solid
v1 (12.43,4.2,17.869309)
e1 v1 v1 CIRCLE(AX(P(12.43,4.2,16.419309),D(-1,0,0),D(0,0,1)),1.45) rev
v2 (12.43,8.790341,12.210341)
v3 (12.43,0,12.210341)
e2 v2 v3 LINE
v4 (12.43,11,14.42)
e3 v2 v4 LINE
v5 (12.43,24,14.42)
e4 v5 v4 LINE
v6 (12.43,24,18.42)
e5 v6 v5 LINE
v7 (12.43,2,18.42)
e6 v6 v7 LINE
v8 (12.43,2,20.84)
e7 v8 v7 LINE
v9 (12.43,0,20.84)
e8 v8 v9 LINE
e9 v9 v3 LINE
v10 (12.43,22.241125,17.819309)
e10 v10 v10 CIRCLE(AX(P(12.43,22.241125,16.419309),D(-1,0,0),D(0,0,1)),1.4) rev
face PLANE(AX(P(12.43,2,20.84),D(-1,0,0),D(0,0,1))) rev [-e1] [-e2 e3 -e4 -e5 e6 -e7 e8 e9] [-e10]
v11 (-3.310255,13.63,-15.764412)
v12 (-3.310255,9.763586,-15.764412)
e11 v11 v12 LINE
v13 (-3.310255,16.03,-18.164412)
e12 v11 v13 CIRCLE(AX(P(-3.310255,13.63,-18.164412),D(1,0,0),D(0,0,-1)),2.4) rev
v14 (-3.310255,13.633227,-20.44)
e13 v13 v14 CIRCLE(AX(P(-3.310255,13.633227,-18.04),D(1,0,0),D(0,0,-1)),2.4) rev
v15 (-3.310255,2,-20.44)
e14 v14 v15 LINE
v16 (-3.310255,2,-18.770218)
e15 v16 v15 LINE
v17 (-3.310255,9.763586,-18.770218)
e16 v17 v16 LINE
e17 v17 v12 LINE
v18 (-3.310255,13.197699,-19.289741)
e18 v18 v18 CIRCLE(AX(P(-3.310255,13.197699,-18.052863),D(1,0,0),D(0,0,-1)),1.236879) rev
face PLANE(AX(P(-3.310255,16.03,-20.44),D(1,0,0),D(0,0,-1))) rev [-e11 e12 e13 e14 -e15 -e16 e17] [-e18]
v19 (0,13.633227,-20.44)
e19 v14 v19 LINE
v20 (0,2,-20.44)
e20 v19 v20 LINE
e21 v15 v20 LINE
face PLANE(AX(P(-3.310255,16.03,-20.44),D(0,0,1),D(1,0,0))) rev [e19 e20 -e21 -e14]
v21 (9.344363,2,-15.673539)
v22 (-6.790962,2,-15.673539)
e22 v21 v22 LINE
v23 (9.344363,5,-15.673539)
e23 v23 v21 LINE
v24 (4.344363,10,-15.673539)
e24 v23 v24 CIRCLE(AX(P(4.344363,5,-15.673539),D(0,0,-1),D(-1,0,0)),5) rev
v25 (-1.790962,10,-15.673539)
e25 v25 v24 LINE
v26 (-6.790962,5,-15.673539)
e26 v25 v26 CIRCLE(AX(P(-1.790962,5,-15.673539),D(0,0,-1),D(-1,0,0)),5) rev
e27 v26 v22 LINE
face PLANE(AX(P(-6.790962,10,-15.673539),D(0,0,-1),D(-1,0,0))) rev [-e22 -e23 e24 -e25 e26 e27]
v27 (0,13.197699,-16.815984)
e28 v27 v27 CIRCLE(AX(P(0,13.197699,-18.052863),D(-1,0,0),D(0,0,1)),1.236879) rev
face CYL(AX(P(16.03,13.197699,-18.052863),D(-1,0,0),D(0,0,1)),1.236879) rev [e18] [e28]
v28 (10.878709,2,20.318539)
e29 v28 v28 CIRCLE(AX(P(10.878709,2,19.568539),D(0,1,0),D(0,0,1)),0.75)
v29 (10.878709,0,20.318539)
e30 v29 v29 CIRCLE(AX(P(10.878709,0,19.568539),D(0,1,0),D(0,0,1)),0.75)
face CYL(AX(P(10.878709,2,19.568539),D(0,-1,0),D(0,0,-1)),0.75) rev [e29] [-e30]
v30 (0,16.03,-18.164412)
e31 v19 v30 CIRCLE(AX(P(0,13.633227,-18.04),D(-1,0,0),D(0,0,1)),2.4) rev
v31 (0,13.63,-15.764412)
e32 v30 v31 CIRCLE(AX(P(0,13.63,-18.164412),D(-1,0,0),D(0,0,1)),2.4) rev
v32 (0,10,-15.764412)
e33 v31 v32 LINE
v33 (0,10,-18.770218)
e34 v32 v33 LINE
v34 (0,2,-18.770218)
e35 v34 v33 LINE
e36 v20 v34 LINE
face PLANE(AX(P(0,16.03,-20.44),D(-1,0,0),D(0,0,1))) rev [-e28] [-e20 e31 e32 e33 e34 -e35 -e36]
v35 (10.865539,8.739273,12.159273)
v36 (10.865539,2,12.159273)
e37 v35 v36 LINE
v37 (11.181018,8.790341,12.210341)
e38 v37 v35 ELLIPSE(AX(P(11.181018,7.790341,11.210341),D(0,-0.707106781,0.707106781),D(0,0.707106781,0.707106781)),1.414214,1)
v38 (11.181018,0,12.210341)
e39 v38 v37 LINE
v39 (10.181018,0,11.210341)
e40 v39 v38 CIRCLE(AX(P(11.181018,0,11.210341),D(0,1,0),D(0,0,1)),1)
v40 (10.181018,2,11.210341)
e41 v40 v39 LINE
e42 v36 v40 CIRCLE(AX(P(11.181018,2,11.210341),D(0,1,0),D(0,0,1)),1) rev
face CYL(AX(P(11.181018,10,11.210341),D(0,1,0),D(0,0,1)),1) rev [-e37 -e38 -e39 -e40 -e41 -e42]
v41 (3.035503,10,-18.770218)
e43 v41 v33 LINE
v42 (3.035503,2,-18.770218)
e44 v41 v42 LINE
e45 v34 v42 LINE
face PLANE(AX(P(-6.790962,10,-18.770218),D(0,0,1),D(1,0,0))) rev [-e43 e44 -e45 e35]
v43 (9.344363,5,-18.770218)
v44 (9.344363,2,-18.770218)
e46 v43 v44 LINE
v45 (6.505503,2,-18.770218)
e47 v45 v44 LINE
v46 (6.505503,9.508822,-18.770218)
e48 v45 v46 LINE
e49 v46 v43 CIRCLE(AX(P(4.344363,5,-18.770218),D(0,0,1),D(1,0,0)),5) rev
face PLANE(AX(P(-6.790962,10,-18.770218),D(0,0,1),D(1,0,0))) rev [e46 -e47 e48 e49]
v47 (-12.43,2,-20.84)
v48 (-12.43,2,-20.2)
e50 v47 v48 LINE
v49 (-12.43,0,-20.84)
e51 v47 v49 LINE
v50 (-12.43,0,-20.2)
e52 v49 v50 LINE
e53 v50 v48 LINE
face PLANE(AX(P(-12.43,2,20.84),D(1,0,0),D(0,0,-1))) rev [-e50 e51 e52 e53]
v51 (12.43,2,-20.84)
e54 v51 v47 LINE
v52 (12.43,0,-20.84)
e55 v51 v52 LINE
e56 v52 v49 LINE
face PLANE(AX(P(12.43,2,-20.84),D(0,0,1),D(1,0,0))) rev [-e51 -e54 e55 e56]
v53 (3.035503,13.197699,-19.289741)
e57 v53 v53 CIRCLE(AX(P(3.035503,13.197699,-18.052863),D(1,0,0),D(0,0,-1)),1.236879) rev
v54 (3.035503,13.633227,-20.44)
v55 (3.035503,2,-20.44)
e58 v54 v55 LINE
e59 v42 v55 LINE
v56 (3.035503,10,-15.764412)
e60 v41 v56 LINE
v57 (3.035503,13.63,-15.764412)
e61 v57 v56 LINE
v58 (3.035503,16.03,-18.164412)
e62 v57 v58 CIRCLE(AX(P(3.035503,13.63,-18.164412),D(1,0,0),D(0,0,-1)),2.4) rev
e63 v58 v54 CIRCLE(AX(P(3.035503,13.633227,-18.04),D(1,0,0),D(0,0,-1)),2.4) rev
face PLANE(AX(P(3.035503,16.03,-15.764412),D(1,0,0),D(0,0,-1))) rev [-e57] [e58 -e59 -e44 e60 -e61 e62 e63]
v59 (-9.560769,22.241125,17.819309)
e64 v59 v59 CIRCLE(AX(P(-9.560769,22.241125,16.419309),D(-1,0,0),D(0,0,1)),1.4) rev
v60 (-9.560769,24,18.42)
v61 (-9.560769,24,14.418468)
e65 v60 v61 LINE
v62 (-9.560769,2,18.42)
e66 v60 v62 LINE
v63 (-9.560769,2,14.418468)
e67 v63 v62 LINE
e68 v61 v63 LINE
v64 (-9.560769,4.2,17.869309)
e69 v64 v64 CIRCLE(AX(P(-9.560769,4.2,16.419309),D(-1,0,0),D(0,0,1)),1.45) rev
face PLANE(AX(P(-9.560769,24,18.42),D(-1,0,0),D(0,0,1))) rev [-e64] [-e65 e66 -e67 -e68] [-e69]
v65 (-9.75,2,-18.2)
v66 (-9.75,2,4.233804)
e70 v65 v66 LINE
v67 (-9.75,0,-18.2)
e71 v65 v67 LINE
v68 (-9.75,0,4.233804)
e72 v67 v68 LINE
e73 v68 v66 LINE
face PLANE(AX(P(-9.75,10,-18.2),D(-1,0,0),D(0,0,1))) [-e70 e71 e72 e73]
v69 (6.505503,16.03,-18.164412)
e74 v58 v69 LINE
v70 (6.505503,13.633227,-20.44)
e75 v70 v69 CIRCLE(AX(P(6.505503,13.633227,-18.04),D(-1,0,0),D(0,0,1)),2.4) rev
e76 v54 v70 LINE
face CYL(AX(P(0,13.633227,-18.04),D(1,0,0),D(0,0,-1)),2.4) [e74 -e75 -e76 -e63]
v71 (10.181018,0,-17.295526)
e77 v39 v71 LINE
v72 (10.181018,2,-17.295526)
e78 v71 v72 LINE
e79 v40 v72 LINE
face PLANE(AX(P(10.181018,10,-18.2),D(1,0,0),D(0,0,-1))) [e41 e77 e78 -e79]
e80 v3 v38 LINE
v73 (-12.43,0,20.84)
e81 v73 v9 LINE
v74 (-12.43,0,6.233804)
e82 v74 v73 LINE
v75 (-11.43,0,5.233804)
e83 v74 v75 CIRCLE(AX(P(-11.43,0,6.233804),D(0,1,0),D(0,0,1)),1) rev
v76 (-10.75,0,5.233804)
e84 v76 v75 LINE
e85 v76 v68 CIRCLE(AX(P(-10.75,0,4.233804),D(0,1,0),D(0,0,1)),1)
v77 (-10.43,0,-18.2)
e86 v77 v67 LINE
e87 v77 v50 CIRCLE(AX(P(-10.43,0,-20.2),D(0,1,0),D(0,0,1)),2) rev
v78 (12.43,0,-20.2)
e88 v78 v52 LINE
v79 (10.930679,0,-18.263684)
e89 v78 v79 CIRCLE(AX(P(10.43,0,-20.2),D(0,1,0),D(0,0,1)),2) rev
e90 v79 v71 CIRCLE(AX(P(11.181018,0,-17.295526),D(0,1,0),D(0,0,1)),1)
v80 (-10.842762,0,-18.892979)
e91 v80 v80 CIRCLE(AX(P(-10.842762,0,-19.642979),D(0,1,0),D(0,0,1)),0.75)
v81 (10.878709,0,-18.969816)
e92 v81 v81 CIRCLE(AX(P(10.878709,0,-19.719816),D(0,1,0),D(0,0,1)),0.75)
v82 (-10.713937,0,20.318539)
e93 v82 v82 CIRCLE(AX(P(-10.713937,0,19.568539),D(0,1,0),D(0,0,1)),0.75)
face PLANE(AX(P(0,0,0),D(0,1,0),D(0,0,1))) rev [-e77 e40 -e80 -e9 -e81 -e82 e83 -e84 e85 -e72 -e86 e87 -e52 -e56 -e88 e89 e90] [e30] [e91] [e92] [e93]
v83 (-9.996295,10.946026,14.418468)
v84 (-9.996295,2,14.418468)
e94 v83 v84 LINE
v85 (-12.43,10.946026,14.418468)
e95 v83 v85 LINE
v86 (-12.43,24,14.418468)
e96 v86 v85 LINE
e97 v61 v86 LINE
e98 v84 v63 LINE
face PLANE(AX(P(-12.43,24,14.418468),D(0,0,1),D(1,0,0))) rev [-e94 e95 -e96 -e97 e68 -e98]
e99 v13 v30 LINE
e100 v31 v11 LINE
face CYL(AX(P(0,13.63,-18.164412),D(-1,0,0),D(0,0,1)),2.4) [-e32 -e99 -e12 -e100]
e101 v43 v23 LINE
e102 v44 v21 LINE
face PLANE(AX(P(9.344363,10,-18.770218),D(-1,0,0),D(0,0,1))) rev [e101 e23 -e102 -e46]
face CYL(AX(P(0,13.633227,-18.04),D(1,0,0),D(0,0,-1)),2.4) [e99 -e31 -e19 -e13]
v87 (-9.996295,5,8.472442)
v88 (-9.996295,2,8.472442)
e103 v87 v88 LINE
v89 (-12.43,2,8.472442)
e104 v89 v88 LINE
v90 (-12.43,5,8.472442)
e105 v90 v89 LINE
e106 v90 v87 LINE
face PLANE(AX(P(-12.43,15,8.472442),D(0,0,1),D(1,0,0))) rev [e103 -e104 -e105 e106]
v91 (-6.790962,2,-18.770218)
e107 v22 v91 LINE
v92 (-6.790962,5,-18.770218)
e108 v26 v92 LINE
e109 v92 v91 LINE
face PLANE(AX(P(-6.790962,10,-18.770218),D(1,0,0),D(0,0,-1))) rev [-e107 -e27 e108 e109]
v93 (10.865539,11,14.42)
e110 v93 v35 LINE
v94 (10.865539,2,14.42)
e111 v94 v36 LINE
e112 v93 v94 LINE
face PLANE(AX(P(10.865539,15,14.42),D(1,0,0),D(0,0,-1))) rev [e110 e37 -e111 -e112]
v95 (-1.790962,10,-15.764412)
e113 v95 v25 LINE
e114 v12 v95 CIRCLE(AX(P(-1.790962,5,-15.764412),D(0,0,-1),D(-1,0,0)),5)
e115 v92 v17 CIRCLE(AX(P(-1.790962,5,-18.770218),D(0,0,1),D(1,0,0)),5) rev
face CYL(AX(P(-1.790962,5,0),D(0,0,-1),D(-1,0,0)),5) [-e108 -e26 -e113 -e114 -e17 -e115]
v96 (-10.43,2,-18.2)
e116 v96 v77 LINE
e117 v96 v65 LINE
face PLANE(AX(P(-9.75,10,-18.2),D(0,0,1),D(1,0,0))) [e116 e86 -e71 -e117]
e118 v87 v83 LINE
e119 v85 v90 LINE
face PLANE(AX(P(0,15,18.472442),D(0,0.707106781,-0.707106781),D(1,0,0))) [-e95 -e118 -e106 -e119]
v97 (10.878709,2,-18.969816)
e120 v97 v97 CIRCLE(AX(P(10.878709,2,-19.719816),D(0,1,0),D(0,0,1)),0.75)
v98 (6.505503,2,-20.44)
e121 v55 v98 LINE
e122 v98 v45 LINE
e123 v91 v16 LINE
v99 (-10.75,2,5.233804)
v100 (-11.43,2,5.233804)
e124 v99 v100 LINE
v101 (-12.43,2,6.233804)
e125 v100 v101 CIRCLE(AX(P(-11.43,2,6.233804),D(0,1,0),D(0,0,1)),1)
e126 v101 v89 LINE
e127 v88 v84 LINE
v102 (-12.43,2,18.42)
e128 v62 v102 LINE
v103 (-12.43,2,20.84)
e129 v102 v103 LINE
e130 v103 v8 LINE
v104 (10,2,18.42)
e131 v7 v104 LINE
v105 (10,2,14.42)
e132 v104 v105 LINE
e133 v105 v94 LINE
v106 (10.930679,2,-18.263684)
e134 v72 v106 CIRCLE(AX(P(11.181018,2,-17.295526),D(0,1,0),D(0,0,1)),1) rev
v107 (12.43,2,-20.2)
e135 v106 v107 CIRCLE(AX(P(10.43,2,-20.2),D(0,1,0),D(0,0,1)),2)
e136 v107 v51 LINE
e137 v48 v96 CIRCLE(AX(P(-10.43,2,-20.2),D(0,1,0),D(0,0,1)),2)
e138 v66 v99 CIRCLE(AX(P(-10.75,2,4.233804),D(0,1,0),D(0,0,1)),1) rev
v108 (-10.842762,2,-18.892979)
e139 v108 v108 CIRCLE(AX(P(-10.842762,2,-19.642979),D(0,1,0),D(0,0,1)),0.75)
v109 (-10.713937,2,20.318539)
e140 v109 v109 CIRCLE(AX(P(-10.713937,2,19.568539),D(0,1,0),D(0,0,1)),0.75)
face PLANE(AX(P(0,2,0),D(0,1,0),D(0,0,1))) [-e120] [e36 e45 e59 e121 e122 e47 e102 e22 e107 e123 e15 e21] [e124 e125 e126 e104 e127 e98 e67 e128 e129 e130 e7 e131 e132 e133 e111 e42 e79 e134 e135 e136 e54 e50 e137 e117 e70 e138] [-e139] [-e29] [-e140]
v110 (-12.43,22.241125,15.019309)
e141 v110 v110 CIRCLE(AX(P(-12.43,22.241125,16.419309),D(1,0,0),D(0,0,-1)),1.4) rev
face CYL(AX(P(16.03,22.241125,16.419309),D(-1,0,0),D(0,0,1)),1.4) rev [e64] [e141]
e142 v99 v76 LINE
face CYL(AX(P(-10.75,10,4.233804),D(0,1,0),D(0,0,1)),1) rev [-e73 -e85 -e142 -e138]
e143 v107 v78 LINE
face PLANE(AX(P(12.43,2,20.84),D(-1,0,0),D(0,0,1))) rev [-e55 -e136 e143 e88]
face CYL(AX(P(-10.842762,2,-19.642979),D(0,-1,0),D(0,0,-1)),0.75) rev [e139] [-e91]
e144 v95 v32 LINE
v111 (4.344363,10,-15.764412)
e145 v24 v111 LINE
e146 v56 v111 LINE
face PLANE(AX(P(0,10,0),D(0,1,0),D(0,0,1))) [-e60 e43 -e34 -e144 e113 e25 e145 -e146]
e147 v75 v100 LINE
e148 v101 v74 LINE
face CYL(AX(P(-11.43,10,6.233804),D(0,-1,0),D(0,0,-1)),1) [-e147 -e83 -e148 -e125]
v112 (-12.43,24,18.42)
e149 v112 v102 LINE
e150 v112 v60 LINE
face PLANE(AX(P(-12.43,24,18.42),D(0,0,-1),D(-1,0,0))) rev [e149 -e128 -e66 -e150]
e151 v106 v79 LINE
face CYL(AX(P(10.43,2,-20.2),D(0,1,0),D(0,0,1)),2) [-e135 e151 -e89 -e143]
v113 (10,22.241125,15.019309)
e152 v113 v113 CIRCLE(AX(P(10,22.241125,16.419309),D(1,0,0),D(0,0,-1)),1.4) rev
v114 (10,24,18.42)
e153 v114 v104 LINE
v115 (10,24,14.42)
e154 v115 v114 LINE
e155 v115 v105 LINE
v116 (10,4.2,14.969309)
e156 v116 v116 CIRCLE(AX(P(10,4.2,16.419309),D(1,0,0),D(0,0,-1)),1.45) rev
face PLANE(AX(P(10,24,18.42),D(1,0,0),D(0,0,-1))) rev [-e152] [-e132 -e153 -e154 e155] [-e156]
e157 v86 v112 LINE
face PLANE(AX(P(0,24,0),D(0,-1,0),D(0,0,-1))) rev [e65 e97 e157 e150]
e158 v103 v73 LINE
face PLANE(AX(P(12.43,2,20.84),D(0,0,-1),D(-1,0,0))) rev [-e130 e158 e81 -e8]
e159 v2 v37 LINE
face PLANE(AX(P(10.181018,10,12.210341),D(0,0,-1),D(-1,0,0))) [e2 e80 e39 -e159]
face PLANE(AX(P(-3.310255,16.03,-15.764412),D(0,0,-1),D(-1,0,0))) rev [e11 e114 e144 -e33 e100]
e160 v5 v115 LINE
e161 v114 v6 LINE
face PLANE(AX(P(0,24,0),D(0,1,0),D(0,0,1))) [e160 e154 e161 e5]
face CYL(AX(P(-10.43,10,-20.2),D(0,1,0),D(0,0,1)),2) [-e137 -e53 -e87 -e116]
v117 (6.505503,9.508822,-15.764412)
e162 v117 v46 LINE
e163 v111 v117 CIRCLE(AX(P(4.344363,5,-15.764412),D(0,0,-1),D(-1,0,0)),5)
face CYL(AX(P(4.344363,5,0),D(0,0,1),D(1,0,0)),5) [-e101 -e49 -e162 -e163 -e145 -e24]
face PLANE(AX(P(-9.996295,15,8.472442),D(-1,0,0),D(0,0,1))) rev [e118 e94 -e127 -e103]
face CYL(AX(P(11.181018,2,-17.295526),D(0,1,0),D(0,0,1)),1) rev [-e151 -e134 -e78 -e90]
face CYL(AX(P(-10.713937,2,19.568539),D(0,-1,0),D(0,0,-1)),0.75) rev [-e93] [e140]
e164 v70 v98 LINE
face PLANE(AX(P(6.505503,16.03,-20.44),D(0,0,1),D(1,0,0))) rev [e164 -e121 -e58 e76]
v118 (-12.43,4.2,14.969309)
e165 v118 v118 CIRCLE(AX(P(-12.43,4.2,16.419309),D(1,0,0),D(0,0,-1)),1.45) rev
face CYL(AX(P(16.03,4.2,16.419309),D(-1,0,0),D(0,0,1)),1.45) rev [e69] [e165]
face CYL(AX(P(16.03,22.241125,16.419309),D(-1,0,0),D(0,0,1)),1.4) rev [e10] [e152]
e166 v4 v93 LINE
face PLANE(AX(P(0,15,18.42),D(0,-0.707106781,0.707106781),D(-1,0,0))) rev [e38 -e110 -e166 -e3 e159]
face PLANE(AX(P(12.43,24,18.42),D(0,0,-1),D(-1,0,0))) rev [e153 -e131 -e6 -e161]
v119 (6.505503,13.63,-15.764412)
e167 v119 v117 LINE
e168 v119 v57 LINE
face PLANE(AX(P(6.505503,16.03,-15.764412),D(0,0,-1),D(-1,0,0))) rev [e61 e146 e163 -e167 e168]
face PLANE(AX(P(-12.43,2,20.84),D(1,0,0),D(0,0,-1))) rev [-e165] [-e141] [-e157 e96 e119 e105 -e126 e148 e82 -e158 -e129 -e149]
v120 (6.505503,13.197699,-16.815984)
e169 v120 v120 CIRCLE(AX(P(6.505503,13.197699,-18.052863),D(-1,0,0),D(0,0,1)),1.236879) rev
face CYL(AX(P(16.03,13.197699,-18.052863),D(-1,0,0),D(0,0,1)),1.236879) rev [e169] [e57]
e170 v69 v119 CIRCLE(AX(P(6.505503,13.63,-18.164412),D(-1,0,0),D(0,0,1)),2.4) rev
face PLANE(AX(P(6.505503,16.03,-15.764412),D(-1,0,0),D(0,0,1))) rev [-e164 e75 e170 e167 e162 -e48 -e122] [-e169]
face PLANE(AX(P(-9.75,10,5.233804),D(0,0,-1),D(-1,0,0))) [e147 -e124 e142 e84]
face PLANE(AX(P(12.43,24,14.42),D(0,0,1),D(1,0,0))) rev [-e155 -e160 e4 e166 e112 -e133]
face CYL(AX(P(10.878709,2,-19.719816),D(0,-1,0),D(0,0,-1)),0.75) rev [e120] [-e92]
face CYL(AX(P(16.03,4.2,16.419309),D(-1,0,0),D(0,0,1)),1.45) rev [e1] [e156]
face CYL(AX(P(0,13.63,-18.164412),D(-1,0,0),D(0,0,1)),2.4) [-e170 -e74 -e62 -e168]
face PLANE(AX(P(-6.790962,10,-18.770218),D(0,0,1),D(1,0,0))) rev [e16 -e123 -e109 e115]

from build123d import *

# Parameters (mm, degrees)
SKETCH_1_W                = 24.86
SKETCH_1_H                = 41.68
SKETCH_1_R                = 0.75
EXTRUDE_2_DEPTH           = 2
SKETCH_4_W                = 2.869231424
SKETCH_4_H                = 4.001531821
SKETCH_4_W_2              = 2.43
SKETCH_4_H_2              = 4
EXTRUDE_3_DEPTH           = 24
SKETCH_8_W                = 3.310255182
SKETCH_8_H                = 4.675588029
SKETCH_8_W_2              = 3.47
EXTRUDE_5_DEPTH           = 16.03
FILLET_5_R                = 2.4
FILLET_6_R                = 2.4
FILLET_7_R                = 2.4
FILLET_8_R                = 2.4
CUT_EXTRUDE_7_DEPTH       = 16.03
CUT_EXTRUDE_7_DEPTH_BACK  = 16.03
SKETCH_13_R               = 1.236878532
CUT_EXTRUDE_8_DEPTH       = 16.03
CUT_EXTRUDE_8_DEPTH_BACK  = 16.03
SKETCH_5_R                = 1.45
CUT_EXTRUDE_9_DEPTH       = 16.03
CUT_EXTRUDE_9_DEPTH_BACK  = 16.03
SKETCH_14_R               = 1.4
SKETCH_16_W               = 16.135324728
SKETCH_16_H               = 3.096678483
EXTRUDE_8_DEPTH           = 10
FILLET_10_R               = 5
FILLET_13_R               = 5
SKETCH_17_W               = 2.433704545
SKETCH_17_H               = 5.946026496
SKETCH_17_W_2             = 1.564461462
SKETCH_17_H_2             = 6
EXTRUDE_9_DEPTH           = 15
CHAMFER_1_SIZE            = 10
CHAMFER_2_SIZE            = 10
CUT_EXTRUDE_16_DEPTH      = 10
CUT_EXTRUDE_16_DEPTH_BACK = 10
SKETCH_19_W               = 2.68
SKETCH_19_H               = 23.433804394
CUT_EXTRUDE_17_DEPTH      = 10
CUT_EXTRUDE_17_DEPTH_BACK = 10
SKETCH_18_W               = 2.24898196
SKETCH_18_H               = 30.410340658
FILLET_17_R               = 2
FILLET_18_R               = 2
FILLET_19_R               = 1


with BuildPart() as part:
    # 草图1 → 凸台-拉伸2 (new body)
    with BuildSketch(Plane(origin=(0, 0, 0), x_dir=(1, 0, 0), z_dir=(0, 1, 0))):
        Rectangle(SKETCH_1_W, SKETCH_1_H)
        with Locations(Location((-10.842762007, 19.642978565, 0), (0, 0, 270))):
            Circle(SKETCH_1_R, mode=Mode.SUBTRACT)
        with Locations(Location((10.87870886, 19.719816311, 0), (0, 0, 270))):
            Circle(SKETCH_1_R, mode=Mode.SUBTRACT)
        with Locations(Location((-10.713936696, -19.568538996, 0), (0, 0, 270))):
            Circle(SKETCH_1_R, mode=Mode.SUBTRACT)
        with Locations(Location((10.87870886, -19.568538996, 0), (0, 0, 270))):
            Circle(SKETCH_1_R, mode=Mode.SUBTRACT)
    extrude(amount=EXTRUDE_2_DEPTH)

    # 草图4 → 凸台-拉伸3 (add)
    with BuildSketch(Plane(origin=(0, 0, 0), x_dir=(1, 0, 0), z_dir=(0, 1, 0))):
        with Locations((-10.995384288, -16.41923409)):
            Rectangle(SKETCH_4_W, SKETCH_4_H)
        with Locations((11.215, -16.42)):
            Rectangle(SKETCH_4_W_2, SKETCH_4_H_2)
    extrude(amount=EXTRUDE_3_DEPTH)

    # 草图8 → 凸台-拉伸5 (add)
    with BuildSketch(Plane(origin=(0, 0, 0), x_dir=(1, 0, 0), z_dir=(0, 1, 0))):
        with Locations((-1.655127591, 18.102205985)):
            Rectangle(SKETCH_8_W, SKETCH_8_H)
        with Locations((4.770502505, 18.102205985)):
            Rectangle(SKETCH_8_W_2, SKETCH_8_H)
    extrude(amount=EXTRUDE_5_DEPTH)

    # 圆角5
    fillet_5_edges = [part.edges().sort_by_distance(p)[0] for p in [
        (-1.655127591, 16.03, -15.764411971),
    ]]
    fillet(fillet_5_edges, radius=FILLET_5_R)

    # 圆角6
    fillet_6_edges = [part.edges().sort_by_distance(p)[0] for p in [
        (4.770502505, 16.03, -15.764411971),
    ]]
    fillet(fillet_6_edges, radius=FILLET_6_R)

    # 圆角7
    # the kernel refuses this fillet: 2.4 mm, written as the material it takes off along each edge
    with BuildSketch(Plane(origin=(-2.956430437, 16.03, -20.44), x_dir=(0, 0, 1), z_dir=(1, 0, 0))) as fillet_7_piece_1_section:
        with BuildLine():
            CenterArc((2.4, 2.396773177), FILLET_7_R, 180, 87.028551133)
            Line((0, 2.396773177), (0, 0))
            Line((0, 0), (2.275588029, 0))
        make_face()
    fillet_7_piece_1 = extrude(amount=15.453865884, mode=Mode.PRIVATE)
    fillet_7_piece_1 = split(fillet_7_piece_1, bisect_by=Plane(origin=(0, 16.03, -20.44), z_dir=(1, 0, 0)), keep=Keep.TOP, mode=Mode.PRIVATE)
    add(fillet_7_piece_1, mode=Mode.SUBTRACT)

    # 圆角8
    # the kernel refuses this fillet: 2.4 mm, written as the material it takes off along each edge
    with BuildSketch(Plane(origin=(-9.302188124, 16.03, -20.44), x_dir=(0, 0, 1), z_dir=(1, 0, 0))) as fillet_8_piece_1:
        with BuildLine():
            CenterArc((2.4, 2.396773177), FILLET_8_R, 180, 87.028551133)
            Line((0, 2.396773177), (-0.048, 2.396773177))
            Line((-0.048, 2.396773177), (-0.048, 0))
            Line((-0.048, 0), (0, -0.048))
            ThreePointArc((0, -0.048), (1.137794014, -0.048), (2.273099789, -0.047935464))
            Line((2.273099789, -0.047935464), (2.275588029, 0))
        make_face()
    extrude(amount=15.294121066, mode=Mode.SUBTRACT)

    # 草图13 → 切除-拉伸7 (cut, two sides: drawn at the far end of the back side and taken through both)
    with BuildSketch(Plane(origin=(0, 0, 0), x_dir=(0, 0, -1), z_dir=(1, 0, 0)).offset(-CUT_EXTRUDE_7_DEPTH_BACK)):
        with Locations(Location((18.052862707, 13.197698645, 0), (0, 0, 180))):
            Circle(SKETCH_13_R)
    extrude(amount=CUT_EXTRUDE_7_DEPTH + CUT_EXTRUDE_7_DEPTH_BACK, mode=Mode.SUBTRACT)

    # 草图5 → 切除-拉伸8 (cut, two sides: drawn at the far end of the back side and taken through both)
    with BuildSketch(Plane(origin=(0, 0, 0), x_dir=(0, 0, -1), z_dir=(1, 0, 0)).offset(-CUT_EXTRUDE_8_DEPTH_BACK)):
        with Locations(Location((-16.419309005, 4.2, 0), (0, 0, 180))):
            Circle(SKETCH_5_R)
    extrude(amount=CUT_EXTRUDE_8_DEPTH + CUT_EXTRUDE_8_DEPTH_BACK, mode=Mode.SUBTRACT)

    # 草图14 → 切除-拉伸9 (cut, two sides: drawn at the far end of the back side and taken through both)
    with BuildSketch(Plane(origin=(0, 0, 0), x_dir=(0, 0, -1), z_dir=(1, 0, 0)).offset(-CUT_EXTRUDE_9_DEPTH_BACK)):
        with Locations(Location((-16.419309005, 22.241125132, 0), (0, 0, 180))):
            Circle(SKETCH_14_R)
    extrude(amount=CUT_EXTRUDE_9_DEPTH + CUT_EXTRUDE_9_DEPTH_BACK, mode=Mode.SUBTRACT)

    # 草图16 → 凸台-拉伸8 (add)
    with BuildSketch(Plane(origin=(0, 0, 0), x_dir=(1, 0, 0), z_dir=(0, 1, 0))):
        with Locations((1.276700778, 17.221878583)):
            Rectangle(SKETCH_16_W, SKETCH_16_H)
    extrude(amount=EXTRUDE_8_DEPTH)

    # 圆角10
    fillet_10_edges = [part.edges().sort_by_distance(p)[0] for p in [
        (-6.790961586, 10, -17.221878582),
    ]]
    fillet(fillet_10_edges, radius=FILLET_10_R)

    # 圆角13
    fillet_13_edges = [part.edges().sort_by_distance(p)[0] for p in [
        (9.344363142, 10, -17.221878582),
    ]]
    fillet(fillet_13_edges, radius=FILLET_13_R)

    # 草图17 → 凸台-拉伸9 (add)
    with BuildSketch(Plane(origin=(0, 0, 0), x_dir=(1, 0, 0), z_dir=(0, 1, 0))):
        with Locations((-11.213147728, -11.445454931)):
            Rectangle(SKETCH_17_W, SKETCH_17_H)
        with Locations((11.647769269, -11.42)):
            Rectangle(SKETCH_17_W_2, SKETCH_17_H_2)
    extrude(amount=EXTRUDE_9_DEPTH)

    # 倒角1
    # the kernel refuses this chamfer: 10 mm, written as the material it takes off along each edge
    with BuildSketch(Plane(origin=(-38.14682988, 15, 8.472441683), x_dir=(0, 0, 1), z_dir=(1, 0, 0))) as chamfer_1_piece_1_section:
        Polygon((CHAMFER_1_SIZE, 0), (0, CHAMFER_1_SIZE), (0, 0), align=None)
    chamfer_1_piece_1 = extrude(amount=53.867364305, mode=Mode.PRIVATE)
    chamfer_1_piece_1 = split(chamfer_1_piece_1, bisect_by=Plane(origin=(-38.14682988, 15, 14.418468179), z_dir=(0, 0, -1)), keep=Keep.TOP, mode=Mode.PRIVATE)
    chamfer_1_piece_1 = split(chamfer_1_piece_1, bisect_by=Plane(origin=(10, 15, 8.472441683), z_dir=(-1, 0, 0)), keep=Keep.TOP, mode=Mode.PRIVATE)
    add(chamfer_1_piece_1, mode=Mode.SUBTRACT)

    # 倒角2
    # the kernel refuses this chamfer: 10 mm, written as the material it takes off along each edge
    with BuildSketch(Plane(origin=(38.14682988, 15, 8.42), x_dir=(0, 0, 1), z_dir=(-1, 0, 0))) as chamfer_2_piece_1_section:
        Polygon((CHAMFER_2_SIZE, 0), (0, -CHAMFER_2_SIZE), (0, 0), align=None)
    chamfer_2_piece_1 = extrude(amount=52.998121222, mode=Mode.PRIVATE)
    chamfer_2_piece_1 = split(chamfer_2_piece_1, bisect_by=Plane(origin=(38.14682988, 15, 14.42), z_dir=(0, 0, -1)), keep=Keep.TOP, mode=Mode.PRIVATE)
    chamfer_2_piece_1 = split(chamfer_2_piece_1, bisect_by=Plane(origin=(10, 15, 8.42), z_dir=(1, 0, 0)), keep=Keep.TOP, mode=Mode.PRIVATE)
    add(chamfer_2_piece_1, mode=Mode.SUBTRACT)

    # 草图19 → 切除-拉伸16 (cut, two sides: drawn at the far end of the back side and taken through both)
    with BuildSketch(Plane(origin=(0, 0, 0), x_dir=(1, 0, 0), z_dir=(0, 1, 0)).offset(-CUT_EXTRUDE_16_DEPTH_BACK)):
        with Locations((-11.09, 6.483097803)):
            Rectangle(SKETCH_19_W, SKETCH_19_H)
    extrude(amount=CUT_EXTRUDE_16_DEPTH + CUT_EXTRUDE_16_DEPTH_BACK, mode=Mode.SUBTRACT)

    # 草图18 → 切除-拉伸17 (cut, two sides: drawn at the far end of the back side and taken through both)
    with BuildSketch(Plane(origin=(0, 0, 0), x_dir=(1, 0, 0), z_dir=(0, 1, 0)).offset(-CUT_EXTRUDE_17_DEPTH_BACK)):
        with Locations((11.30550902, 2.994829671)):
            Rectangle(SKETCH_18_W, SKETCH_18_H)
    extrude(amount=CUT_EXTRUDE_17_DEPTH + CUT_EXTRUDE_17_DEPTH_BACK, mode=Mode.SUBTRACT)

    # 圆角17
    fillet_17_edges = [part.edges().sort_by_distance(p)[0] for p in [
        (12.43, 1, -18.2),
    ]]
    fillet(fillet_17_edges, radius=FILLET_17_R)

    # 圆角18
    fillet_18_edges = [part.edges().sort_by_distance(p)[0] for p in [
        (-12.43, 1, -18.2),
    ]]
    fillet(fillet_18_edges, radius=FILLET_18_R)

    # 圆角19
    fillet_19_edges = [part.edges().sort_by_distance(p)[0] for p in [
        (10.18101804, 1, -18.2),
        (10.18101804, 1, 12.210340658),
        (-12.43, 1, 5.233804394),
        (-9.75, 1, 5.233804394),
    ]]
    fillet(fillet_19_edges, radius=FILLET_19_R)


solid = part.part
